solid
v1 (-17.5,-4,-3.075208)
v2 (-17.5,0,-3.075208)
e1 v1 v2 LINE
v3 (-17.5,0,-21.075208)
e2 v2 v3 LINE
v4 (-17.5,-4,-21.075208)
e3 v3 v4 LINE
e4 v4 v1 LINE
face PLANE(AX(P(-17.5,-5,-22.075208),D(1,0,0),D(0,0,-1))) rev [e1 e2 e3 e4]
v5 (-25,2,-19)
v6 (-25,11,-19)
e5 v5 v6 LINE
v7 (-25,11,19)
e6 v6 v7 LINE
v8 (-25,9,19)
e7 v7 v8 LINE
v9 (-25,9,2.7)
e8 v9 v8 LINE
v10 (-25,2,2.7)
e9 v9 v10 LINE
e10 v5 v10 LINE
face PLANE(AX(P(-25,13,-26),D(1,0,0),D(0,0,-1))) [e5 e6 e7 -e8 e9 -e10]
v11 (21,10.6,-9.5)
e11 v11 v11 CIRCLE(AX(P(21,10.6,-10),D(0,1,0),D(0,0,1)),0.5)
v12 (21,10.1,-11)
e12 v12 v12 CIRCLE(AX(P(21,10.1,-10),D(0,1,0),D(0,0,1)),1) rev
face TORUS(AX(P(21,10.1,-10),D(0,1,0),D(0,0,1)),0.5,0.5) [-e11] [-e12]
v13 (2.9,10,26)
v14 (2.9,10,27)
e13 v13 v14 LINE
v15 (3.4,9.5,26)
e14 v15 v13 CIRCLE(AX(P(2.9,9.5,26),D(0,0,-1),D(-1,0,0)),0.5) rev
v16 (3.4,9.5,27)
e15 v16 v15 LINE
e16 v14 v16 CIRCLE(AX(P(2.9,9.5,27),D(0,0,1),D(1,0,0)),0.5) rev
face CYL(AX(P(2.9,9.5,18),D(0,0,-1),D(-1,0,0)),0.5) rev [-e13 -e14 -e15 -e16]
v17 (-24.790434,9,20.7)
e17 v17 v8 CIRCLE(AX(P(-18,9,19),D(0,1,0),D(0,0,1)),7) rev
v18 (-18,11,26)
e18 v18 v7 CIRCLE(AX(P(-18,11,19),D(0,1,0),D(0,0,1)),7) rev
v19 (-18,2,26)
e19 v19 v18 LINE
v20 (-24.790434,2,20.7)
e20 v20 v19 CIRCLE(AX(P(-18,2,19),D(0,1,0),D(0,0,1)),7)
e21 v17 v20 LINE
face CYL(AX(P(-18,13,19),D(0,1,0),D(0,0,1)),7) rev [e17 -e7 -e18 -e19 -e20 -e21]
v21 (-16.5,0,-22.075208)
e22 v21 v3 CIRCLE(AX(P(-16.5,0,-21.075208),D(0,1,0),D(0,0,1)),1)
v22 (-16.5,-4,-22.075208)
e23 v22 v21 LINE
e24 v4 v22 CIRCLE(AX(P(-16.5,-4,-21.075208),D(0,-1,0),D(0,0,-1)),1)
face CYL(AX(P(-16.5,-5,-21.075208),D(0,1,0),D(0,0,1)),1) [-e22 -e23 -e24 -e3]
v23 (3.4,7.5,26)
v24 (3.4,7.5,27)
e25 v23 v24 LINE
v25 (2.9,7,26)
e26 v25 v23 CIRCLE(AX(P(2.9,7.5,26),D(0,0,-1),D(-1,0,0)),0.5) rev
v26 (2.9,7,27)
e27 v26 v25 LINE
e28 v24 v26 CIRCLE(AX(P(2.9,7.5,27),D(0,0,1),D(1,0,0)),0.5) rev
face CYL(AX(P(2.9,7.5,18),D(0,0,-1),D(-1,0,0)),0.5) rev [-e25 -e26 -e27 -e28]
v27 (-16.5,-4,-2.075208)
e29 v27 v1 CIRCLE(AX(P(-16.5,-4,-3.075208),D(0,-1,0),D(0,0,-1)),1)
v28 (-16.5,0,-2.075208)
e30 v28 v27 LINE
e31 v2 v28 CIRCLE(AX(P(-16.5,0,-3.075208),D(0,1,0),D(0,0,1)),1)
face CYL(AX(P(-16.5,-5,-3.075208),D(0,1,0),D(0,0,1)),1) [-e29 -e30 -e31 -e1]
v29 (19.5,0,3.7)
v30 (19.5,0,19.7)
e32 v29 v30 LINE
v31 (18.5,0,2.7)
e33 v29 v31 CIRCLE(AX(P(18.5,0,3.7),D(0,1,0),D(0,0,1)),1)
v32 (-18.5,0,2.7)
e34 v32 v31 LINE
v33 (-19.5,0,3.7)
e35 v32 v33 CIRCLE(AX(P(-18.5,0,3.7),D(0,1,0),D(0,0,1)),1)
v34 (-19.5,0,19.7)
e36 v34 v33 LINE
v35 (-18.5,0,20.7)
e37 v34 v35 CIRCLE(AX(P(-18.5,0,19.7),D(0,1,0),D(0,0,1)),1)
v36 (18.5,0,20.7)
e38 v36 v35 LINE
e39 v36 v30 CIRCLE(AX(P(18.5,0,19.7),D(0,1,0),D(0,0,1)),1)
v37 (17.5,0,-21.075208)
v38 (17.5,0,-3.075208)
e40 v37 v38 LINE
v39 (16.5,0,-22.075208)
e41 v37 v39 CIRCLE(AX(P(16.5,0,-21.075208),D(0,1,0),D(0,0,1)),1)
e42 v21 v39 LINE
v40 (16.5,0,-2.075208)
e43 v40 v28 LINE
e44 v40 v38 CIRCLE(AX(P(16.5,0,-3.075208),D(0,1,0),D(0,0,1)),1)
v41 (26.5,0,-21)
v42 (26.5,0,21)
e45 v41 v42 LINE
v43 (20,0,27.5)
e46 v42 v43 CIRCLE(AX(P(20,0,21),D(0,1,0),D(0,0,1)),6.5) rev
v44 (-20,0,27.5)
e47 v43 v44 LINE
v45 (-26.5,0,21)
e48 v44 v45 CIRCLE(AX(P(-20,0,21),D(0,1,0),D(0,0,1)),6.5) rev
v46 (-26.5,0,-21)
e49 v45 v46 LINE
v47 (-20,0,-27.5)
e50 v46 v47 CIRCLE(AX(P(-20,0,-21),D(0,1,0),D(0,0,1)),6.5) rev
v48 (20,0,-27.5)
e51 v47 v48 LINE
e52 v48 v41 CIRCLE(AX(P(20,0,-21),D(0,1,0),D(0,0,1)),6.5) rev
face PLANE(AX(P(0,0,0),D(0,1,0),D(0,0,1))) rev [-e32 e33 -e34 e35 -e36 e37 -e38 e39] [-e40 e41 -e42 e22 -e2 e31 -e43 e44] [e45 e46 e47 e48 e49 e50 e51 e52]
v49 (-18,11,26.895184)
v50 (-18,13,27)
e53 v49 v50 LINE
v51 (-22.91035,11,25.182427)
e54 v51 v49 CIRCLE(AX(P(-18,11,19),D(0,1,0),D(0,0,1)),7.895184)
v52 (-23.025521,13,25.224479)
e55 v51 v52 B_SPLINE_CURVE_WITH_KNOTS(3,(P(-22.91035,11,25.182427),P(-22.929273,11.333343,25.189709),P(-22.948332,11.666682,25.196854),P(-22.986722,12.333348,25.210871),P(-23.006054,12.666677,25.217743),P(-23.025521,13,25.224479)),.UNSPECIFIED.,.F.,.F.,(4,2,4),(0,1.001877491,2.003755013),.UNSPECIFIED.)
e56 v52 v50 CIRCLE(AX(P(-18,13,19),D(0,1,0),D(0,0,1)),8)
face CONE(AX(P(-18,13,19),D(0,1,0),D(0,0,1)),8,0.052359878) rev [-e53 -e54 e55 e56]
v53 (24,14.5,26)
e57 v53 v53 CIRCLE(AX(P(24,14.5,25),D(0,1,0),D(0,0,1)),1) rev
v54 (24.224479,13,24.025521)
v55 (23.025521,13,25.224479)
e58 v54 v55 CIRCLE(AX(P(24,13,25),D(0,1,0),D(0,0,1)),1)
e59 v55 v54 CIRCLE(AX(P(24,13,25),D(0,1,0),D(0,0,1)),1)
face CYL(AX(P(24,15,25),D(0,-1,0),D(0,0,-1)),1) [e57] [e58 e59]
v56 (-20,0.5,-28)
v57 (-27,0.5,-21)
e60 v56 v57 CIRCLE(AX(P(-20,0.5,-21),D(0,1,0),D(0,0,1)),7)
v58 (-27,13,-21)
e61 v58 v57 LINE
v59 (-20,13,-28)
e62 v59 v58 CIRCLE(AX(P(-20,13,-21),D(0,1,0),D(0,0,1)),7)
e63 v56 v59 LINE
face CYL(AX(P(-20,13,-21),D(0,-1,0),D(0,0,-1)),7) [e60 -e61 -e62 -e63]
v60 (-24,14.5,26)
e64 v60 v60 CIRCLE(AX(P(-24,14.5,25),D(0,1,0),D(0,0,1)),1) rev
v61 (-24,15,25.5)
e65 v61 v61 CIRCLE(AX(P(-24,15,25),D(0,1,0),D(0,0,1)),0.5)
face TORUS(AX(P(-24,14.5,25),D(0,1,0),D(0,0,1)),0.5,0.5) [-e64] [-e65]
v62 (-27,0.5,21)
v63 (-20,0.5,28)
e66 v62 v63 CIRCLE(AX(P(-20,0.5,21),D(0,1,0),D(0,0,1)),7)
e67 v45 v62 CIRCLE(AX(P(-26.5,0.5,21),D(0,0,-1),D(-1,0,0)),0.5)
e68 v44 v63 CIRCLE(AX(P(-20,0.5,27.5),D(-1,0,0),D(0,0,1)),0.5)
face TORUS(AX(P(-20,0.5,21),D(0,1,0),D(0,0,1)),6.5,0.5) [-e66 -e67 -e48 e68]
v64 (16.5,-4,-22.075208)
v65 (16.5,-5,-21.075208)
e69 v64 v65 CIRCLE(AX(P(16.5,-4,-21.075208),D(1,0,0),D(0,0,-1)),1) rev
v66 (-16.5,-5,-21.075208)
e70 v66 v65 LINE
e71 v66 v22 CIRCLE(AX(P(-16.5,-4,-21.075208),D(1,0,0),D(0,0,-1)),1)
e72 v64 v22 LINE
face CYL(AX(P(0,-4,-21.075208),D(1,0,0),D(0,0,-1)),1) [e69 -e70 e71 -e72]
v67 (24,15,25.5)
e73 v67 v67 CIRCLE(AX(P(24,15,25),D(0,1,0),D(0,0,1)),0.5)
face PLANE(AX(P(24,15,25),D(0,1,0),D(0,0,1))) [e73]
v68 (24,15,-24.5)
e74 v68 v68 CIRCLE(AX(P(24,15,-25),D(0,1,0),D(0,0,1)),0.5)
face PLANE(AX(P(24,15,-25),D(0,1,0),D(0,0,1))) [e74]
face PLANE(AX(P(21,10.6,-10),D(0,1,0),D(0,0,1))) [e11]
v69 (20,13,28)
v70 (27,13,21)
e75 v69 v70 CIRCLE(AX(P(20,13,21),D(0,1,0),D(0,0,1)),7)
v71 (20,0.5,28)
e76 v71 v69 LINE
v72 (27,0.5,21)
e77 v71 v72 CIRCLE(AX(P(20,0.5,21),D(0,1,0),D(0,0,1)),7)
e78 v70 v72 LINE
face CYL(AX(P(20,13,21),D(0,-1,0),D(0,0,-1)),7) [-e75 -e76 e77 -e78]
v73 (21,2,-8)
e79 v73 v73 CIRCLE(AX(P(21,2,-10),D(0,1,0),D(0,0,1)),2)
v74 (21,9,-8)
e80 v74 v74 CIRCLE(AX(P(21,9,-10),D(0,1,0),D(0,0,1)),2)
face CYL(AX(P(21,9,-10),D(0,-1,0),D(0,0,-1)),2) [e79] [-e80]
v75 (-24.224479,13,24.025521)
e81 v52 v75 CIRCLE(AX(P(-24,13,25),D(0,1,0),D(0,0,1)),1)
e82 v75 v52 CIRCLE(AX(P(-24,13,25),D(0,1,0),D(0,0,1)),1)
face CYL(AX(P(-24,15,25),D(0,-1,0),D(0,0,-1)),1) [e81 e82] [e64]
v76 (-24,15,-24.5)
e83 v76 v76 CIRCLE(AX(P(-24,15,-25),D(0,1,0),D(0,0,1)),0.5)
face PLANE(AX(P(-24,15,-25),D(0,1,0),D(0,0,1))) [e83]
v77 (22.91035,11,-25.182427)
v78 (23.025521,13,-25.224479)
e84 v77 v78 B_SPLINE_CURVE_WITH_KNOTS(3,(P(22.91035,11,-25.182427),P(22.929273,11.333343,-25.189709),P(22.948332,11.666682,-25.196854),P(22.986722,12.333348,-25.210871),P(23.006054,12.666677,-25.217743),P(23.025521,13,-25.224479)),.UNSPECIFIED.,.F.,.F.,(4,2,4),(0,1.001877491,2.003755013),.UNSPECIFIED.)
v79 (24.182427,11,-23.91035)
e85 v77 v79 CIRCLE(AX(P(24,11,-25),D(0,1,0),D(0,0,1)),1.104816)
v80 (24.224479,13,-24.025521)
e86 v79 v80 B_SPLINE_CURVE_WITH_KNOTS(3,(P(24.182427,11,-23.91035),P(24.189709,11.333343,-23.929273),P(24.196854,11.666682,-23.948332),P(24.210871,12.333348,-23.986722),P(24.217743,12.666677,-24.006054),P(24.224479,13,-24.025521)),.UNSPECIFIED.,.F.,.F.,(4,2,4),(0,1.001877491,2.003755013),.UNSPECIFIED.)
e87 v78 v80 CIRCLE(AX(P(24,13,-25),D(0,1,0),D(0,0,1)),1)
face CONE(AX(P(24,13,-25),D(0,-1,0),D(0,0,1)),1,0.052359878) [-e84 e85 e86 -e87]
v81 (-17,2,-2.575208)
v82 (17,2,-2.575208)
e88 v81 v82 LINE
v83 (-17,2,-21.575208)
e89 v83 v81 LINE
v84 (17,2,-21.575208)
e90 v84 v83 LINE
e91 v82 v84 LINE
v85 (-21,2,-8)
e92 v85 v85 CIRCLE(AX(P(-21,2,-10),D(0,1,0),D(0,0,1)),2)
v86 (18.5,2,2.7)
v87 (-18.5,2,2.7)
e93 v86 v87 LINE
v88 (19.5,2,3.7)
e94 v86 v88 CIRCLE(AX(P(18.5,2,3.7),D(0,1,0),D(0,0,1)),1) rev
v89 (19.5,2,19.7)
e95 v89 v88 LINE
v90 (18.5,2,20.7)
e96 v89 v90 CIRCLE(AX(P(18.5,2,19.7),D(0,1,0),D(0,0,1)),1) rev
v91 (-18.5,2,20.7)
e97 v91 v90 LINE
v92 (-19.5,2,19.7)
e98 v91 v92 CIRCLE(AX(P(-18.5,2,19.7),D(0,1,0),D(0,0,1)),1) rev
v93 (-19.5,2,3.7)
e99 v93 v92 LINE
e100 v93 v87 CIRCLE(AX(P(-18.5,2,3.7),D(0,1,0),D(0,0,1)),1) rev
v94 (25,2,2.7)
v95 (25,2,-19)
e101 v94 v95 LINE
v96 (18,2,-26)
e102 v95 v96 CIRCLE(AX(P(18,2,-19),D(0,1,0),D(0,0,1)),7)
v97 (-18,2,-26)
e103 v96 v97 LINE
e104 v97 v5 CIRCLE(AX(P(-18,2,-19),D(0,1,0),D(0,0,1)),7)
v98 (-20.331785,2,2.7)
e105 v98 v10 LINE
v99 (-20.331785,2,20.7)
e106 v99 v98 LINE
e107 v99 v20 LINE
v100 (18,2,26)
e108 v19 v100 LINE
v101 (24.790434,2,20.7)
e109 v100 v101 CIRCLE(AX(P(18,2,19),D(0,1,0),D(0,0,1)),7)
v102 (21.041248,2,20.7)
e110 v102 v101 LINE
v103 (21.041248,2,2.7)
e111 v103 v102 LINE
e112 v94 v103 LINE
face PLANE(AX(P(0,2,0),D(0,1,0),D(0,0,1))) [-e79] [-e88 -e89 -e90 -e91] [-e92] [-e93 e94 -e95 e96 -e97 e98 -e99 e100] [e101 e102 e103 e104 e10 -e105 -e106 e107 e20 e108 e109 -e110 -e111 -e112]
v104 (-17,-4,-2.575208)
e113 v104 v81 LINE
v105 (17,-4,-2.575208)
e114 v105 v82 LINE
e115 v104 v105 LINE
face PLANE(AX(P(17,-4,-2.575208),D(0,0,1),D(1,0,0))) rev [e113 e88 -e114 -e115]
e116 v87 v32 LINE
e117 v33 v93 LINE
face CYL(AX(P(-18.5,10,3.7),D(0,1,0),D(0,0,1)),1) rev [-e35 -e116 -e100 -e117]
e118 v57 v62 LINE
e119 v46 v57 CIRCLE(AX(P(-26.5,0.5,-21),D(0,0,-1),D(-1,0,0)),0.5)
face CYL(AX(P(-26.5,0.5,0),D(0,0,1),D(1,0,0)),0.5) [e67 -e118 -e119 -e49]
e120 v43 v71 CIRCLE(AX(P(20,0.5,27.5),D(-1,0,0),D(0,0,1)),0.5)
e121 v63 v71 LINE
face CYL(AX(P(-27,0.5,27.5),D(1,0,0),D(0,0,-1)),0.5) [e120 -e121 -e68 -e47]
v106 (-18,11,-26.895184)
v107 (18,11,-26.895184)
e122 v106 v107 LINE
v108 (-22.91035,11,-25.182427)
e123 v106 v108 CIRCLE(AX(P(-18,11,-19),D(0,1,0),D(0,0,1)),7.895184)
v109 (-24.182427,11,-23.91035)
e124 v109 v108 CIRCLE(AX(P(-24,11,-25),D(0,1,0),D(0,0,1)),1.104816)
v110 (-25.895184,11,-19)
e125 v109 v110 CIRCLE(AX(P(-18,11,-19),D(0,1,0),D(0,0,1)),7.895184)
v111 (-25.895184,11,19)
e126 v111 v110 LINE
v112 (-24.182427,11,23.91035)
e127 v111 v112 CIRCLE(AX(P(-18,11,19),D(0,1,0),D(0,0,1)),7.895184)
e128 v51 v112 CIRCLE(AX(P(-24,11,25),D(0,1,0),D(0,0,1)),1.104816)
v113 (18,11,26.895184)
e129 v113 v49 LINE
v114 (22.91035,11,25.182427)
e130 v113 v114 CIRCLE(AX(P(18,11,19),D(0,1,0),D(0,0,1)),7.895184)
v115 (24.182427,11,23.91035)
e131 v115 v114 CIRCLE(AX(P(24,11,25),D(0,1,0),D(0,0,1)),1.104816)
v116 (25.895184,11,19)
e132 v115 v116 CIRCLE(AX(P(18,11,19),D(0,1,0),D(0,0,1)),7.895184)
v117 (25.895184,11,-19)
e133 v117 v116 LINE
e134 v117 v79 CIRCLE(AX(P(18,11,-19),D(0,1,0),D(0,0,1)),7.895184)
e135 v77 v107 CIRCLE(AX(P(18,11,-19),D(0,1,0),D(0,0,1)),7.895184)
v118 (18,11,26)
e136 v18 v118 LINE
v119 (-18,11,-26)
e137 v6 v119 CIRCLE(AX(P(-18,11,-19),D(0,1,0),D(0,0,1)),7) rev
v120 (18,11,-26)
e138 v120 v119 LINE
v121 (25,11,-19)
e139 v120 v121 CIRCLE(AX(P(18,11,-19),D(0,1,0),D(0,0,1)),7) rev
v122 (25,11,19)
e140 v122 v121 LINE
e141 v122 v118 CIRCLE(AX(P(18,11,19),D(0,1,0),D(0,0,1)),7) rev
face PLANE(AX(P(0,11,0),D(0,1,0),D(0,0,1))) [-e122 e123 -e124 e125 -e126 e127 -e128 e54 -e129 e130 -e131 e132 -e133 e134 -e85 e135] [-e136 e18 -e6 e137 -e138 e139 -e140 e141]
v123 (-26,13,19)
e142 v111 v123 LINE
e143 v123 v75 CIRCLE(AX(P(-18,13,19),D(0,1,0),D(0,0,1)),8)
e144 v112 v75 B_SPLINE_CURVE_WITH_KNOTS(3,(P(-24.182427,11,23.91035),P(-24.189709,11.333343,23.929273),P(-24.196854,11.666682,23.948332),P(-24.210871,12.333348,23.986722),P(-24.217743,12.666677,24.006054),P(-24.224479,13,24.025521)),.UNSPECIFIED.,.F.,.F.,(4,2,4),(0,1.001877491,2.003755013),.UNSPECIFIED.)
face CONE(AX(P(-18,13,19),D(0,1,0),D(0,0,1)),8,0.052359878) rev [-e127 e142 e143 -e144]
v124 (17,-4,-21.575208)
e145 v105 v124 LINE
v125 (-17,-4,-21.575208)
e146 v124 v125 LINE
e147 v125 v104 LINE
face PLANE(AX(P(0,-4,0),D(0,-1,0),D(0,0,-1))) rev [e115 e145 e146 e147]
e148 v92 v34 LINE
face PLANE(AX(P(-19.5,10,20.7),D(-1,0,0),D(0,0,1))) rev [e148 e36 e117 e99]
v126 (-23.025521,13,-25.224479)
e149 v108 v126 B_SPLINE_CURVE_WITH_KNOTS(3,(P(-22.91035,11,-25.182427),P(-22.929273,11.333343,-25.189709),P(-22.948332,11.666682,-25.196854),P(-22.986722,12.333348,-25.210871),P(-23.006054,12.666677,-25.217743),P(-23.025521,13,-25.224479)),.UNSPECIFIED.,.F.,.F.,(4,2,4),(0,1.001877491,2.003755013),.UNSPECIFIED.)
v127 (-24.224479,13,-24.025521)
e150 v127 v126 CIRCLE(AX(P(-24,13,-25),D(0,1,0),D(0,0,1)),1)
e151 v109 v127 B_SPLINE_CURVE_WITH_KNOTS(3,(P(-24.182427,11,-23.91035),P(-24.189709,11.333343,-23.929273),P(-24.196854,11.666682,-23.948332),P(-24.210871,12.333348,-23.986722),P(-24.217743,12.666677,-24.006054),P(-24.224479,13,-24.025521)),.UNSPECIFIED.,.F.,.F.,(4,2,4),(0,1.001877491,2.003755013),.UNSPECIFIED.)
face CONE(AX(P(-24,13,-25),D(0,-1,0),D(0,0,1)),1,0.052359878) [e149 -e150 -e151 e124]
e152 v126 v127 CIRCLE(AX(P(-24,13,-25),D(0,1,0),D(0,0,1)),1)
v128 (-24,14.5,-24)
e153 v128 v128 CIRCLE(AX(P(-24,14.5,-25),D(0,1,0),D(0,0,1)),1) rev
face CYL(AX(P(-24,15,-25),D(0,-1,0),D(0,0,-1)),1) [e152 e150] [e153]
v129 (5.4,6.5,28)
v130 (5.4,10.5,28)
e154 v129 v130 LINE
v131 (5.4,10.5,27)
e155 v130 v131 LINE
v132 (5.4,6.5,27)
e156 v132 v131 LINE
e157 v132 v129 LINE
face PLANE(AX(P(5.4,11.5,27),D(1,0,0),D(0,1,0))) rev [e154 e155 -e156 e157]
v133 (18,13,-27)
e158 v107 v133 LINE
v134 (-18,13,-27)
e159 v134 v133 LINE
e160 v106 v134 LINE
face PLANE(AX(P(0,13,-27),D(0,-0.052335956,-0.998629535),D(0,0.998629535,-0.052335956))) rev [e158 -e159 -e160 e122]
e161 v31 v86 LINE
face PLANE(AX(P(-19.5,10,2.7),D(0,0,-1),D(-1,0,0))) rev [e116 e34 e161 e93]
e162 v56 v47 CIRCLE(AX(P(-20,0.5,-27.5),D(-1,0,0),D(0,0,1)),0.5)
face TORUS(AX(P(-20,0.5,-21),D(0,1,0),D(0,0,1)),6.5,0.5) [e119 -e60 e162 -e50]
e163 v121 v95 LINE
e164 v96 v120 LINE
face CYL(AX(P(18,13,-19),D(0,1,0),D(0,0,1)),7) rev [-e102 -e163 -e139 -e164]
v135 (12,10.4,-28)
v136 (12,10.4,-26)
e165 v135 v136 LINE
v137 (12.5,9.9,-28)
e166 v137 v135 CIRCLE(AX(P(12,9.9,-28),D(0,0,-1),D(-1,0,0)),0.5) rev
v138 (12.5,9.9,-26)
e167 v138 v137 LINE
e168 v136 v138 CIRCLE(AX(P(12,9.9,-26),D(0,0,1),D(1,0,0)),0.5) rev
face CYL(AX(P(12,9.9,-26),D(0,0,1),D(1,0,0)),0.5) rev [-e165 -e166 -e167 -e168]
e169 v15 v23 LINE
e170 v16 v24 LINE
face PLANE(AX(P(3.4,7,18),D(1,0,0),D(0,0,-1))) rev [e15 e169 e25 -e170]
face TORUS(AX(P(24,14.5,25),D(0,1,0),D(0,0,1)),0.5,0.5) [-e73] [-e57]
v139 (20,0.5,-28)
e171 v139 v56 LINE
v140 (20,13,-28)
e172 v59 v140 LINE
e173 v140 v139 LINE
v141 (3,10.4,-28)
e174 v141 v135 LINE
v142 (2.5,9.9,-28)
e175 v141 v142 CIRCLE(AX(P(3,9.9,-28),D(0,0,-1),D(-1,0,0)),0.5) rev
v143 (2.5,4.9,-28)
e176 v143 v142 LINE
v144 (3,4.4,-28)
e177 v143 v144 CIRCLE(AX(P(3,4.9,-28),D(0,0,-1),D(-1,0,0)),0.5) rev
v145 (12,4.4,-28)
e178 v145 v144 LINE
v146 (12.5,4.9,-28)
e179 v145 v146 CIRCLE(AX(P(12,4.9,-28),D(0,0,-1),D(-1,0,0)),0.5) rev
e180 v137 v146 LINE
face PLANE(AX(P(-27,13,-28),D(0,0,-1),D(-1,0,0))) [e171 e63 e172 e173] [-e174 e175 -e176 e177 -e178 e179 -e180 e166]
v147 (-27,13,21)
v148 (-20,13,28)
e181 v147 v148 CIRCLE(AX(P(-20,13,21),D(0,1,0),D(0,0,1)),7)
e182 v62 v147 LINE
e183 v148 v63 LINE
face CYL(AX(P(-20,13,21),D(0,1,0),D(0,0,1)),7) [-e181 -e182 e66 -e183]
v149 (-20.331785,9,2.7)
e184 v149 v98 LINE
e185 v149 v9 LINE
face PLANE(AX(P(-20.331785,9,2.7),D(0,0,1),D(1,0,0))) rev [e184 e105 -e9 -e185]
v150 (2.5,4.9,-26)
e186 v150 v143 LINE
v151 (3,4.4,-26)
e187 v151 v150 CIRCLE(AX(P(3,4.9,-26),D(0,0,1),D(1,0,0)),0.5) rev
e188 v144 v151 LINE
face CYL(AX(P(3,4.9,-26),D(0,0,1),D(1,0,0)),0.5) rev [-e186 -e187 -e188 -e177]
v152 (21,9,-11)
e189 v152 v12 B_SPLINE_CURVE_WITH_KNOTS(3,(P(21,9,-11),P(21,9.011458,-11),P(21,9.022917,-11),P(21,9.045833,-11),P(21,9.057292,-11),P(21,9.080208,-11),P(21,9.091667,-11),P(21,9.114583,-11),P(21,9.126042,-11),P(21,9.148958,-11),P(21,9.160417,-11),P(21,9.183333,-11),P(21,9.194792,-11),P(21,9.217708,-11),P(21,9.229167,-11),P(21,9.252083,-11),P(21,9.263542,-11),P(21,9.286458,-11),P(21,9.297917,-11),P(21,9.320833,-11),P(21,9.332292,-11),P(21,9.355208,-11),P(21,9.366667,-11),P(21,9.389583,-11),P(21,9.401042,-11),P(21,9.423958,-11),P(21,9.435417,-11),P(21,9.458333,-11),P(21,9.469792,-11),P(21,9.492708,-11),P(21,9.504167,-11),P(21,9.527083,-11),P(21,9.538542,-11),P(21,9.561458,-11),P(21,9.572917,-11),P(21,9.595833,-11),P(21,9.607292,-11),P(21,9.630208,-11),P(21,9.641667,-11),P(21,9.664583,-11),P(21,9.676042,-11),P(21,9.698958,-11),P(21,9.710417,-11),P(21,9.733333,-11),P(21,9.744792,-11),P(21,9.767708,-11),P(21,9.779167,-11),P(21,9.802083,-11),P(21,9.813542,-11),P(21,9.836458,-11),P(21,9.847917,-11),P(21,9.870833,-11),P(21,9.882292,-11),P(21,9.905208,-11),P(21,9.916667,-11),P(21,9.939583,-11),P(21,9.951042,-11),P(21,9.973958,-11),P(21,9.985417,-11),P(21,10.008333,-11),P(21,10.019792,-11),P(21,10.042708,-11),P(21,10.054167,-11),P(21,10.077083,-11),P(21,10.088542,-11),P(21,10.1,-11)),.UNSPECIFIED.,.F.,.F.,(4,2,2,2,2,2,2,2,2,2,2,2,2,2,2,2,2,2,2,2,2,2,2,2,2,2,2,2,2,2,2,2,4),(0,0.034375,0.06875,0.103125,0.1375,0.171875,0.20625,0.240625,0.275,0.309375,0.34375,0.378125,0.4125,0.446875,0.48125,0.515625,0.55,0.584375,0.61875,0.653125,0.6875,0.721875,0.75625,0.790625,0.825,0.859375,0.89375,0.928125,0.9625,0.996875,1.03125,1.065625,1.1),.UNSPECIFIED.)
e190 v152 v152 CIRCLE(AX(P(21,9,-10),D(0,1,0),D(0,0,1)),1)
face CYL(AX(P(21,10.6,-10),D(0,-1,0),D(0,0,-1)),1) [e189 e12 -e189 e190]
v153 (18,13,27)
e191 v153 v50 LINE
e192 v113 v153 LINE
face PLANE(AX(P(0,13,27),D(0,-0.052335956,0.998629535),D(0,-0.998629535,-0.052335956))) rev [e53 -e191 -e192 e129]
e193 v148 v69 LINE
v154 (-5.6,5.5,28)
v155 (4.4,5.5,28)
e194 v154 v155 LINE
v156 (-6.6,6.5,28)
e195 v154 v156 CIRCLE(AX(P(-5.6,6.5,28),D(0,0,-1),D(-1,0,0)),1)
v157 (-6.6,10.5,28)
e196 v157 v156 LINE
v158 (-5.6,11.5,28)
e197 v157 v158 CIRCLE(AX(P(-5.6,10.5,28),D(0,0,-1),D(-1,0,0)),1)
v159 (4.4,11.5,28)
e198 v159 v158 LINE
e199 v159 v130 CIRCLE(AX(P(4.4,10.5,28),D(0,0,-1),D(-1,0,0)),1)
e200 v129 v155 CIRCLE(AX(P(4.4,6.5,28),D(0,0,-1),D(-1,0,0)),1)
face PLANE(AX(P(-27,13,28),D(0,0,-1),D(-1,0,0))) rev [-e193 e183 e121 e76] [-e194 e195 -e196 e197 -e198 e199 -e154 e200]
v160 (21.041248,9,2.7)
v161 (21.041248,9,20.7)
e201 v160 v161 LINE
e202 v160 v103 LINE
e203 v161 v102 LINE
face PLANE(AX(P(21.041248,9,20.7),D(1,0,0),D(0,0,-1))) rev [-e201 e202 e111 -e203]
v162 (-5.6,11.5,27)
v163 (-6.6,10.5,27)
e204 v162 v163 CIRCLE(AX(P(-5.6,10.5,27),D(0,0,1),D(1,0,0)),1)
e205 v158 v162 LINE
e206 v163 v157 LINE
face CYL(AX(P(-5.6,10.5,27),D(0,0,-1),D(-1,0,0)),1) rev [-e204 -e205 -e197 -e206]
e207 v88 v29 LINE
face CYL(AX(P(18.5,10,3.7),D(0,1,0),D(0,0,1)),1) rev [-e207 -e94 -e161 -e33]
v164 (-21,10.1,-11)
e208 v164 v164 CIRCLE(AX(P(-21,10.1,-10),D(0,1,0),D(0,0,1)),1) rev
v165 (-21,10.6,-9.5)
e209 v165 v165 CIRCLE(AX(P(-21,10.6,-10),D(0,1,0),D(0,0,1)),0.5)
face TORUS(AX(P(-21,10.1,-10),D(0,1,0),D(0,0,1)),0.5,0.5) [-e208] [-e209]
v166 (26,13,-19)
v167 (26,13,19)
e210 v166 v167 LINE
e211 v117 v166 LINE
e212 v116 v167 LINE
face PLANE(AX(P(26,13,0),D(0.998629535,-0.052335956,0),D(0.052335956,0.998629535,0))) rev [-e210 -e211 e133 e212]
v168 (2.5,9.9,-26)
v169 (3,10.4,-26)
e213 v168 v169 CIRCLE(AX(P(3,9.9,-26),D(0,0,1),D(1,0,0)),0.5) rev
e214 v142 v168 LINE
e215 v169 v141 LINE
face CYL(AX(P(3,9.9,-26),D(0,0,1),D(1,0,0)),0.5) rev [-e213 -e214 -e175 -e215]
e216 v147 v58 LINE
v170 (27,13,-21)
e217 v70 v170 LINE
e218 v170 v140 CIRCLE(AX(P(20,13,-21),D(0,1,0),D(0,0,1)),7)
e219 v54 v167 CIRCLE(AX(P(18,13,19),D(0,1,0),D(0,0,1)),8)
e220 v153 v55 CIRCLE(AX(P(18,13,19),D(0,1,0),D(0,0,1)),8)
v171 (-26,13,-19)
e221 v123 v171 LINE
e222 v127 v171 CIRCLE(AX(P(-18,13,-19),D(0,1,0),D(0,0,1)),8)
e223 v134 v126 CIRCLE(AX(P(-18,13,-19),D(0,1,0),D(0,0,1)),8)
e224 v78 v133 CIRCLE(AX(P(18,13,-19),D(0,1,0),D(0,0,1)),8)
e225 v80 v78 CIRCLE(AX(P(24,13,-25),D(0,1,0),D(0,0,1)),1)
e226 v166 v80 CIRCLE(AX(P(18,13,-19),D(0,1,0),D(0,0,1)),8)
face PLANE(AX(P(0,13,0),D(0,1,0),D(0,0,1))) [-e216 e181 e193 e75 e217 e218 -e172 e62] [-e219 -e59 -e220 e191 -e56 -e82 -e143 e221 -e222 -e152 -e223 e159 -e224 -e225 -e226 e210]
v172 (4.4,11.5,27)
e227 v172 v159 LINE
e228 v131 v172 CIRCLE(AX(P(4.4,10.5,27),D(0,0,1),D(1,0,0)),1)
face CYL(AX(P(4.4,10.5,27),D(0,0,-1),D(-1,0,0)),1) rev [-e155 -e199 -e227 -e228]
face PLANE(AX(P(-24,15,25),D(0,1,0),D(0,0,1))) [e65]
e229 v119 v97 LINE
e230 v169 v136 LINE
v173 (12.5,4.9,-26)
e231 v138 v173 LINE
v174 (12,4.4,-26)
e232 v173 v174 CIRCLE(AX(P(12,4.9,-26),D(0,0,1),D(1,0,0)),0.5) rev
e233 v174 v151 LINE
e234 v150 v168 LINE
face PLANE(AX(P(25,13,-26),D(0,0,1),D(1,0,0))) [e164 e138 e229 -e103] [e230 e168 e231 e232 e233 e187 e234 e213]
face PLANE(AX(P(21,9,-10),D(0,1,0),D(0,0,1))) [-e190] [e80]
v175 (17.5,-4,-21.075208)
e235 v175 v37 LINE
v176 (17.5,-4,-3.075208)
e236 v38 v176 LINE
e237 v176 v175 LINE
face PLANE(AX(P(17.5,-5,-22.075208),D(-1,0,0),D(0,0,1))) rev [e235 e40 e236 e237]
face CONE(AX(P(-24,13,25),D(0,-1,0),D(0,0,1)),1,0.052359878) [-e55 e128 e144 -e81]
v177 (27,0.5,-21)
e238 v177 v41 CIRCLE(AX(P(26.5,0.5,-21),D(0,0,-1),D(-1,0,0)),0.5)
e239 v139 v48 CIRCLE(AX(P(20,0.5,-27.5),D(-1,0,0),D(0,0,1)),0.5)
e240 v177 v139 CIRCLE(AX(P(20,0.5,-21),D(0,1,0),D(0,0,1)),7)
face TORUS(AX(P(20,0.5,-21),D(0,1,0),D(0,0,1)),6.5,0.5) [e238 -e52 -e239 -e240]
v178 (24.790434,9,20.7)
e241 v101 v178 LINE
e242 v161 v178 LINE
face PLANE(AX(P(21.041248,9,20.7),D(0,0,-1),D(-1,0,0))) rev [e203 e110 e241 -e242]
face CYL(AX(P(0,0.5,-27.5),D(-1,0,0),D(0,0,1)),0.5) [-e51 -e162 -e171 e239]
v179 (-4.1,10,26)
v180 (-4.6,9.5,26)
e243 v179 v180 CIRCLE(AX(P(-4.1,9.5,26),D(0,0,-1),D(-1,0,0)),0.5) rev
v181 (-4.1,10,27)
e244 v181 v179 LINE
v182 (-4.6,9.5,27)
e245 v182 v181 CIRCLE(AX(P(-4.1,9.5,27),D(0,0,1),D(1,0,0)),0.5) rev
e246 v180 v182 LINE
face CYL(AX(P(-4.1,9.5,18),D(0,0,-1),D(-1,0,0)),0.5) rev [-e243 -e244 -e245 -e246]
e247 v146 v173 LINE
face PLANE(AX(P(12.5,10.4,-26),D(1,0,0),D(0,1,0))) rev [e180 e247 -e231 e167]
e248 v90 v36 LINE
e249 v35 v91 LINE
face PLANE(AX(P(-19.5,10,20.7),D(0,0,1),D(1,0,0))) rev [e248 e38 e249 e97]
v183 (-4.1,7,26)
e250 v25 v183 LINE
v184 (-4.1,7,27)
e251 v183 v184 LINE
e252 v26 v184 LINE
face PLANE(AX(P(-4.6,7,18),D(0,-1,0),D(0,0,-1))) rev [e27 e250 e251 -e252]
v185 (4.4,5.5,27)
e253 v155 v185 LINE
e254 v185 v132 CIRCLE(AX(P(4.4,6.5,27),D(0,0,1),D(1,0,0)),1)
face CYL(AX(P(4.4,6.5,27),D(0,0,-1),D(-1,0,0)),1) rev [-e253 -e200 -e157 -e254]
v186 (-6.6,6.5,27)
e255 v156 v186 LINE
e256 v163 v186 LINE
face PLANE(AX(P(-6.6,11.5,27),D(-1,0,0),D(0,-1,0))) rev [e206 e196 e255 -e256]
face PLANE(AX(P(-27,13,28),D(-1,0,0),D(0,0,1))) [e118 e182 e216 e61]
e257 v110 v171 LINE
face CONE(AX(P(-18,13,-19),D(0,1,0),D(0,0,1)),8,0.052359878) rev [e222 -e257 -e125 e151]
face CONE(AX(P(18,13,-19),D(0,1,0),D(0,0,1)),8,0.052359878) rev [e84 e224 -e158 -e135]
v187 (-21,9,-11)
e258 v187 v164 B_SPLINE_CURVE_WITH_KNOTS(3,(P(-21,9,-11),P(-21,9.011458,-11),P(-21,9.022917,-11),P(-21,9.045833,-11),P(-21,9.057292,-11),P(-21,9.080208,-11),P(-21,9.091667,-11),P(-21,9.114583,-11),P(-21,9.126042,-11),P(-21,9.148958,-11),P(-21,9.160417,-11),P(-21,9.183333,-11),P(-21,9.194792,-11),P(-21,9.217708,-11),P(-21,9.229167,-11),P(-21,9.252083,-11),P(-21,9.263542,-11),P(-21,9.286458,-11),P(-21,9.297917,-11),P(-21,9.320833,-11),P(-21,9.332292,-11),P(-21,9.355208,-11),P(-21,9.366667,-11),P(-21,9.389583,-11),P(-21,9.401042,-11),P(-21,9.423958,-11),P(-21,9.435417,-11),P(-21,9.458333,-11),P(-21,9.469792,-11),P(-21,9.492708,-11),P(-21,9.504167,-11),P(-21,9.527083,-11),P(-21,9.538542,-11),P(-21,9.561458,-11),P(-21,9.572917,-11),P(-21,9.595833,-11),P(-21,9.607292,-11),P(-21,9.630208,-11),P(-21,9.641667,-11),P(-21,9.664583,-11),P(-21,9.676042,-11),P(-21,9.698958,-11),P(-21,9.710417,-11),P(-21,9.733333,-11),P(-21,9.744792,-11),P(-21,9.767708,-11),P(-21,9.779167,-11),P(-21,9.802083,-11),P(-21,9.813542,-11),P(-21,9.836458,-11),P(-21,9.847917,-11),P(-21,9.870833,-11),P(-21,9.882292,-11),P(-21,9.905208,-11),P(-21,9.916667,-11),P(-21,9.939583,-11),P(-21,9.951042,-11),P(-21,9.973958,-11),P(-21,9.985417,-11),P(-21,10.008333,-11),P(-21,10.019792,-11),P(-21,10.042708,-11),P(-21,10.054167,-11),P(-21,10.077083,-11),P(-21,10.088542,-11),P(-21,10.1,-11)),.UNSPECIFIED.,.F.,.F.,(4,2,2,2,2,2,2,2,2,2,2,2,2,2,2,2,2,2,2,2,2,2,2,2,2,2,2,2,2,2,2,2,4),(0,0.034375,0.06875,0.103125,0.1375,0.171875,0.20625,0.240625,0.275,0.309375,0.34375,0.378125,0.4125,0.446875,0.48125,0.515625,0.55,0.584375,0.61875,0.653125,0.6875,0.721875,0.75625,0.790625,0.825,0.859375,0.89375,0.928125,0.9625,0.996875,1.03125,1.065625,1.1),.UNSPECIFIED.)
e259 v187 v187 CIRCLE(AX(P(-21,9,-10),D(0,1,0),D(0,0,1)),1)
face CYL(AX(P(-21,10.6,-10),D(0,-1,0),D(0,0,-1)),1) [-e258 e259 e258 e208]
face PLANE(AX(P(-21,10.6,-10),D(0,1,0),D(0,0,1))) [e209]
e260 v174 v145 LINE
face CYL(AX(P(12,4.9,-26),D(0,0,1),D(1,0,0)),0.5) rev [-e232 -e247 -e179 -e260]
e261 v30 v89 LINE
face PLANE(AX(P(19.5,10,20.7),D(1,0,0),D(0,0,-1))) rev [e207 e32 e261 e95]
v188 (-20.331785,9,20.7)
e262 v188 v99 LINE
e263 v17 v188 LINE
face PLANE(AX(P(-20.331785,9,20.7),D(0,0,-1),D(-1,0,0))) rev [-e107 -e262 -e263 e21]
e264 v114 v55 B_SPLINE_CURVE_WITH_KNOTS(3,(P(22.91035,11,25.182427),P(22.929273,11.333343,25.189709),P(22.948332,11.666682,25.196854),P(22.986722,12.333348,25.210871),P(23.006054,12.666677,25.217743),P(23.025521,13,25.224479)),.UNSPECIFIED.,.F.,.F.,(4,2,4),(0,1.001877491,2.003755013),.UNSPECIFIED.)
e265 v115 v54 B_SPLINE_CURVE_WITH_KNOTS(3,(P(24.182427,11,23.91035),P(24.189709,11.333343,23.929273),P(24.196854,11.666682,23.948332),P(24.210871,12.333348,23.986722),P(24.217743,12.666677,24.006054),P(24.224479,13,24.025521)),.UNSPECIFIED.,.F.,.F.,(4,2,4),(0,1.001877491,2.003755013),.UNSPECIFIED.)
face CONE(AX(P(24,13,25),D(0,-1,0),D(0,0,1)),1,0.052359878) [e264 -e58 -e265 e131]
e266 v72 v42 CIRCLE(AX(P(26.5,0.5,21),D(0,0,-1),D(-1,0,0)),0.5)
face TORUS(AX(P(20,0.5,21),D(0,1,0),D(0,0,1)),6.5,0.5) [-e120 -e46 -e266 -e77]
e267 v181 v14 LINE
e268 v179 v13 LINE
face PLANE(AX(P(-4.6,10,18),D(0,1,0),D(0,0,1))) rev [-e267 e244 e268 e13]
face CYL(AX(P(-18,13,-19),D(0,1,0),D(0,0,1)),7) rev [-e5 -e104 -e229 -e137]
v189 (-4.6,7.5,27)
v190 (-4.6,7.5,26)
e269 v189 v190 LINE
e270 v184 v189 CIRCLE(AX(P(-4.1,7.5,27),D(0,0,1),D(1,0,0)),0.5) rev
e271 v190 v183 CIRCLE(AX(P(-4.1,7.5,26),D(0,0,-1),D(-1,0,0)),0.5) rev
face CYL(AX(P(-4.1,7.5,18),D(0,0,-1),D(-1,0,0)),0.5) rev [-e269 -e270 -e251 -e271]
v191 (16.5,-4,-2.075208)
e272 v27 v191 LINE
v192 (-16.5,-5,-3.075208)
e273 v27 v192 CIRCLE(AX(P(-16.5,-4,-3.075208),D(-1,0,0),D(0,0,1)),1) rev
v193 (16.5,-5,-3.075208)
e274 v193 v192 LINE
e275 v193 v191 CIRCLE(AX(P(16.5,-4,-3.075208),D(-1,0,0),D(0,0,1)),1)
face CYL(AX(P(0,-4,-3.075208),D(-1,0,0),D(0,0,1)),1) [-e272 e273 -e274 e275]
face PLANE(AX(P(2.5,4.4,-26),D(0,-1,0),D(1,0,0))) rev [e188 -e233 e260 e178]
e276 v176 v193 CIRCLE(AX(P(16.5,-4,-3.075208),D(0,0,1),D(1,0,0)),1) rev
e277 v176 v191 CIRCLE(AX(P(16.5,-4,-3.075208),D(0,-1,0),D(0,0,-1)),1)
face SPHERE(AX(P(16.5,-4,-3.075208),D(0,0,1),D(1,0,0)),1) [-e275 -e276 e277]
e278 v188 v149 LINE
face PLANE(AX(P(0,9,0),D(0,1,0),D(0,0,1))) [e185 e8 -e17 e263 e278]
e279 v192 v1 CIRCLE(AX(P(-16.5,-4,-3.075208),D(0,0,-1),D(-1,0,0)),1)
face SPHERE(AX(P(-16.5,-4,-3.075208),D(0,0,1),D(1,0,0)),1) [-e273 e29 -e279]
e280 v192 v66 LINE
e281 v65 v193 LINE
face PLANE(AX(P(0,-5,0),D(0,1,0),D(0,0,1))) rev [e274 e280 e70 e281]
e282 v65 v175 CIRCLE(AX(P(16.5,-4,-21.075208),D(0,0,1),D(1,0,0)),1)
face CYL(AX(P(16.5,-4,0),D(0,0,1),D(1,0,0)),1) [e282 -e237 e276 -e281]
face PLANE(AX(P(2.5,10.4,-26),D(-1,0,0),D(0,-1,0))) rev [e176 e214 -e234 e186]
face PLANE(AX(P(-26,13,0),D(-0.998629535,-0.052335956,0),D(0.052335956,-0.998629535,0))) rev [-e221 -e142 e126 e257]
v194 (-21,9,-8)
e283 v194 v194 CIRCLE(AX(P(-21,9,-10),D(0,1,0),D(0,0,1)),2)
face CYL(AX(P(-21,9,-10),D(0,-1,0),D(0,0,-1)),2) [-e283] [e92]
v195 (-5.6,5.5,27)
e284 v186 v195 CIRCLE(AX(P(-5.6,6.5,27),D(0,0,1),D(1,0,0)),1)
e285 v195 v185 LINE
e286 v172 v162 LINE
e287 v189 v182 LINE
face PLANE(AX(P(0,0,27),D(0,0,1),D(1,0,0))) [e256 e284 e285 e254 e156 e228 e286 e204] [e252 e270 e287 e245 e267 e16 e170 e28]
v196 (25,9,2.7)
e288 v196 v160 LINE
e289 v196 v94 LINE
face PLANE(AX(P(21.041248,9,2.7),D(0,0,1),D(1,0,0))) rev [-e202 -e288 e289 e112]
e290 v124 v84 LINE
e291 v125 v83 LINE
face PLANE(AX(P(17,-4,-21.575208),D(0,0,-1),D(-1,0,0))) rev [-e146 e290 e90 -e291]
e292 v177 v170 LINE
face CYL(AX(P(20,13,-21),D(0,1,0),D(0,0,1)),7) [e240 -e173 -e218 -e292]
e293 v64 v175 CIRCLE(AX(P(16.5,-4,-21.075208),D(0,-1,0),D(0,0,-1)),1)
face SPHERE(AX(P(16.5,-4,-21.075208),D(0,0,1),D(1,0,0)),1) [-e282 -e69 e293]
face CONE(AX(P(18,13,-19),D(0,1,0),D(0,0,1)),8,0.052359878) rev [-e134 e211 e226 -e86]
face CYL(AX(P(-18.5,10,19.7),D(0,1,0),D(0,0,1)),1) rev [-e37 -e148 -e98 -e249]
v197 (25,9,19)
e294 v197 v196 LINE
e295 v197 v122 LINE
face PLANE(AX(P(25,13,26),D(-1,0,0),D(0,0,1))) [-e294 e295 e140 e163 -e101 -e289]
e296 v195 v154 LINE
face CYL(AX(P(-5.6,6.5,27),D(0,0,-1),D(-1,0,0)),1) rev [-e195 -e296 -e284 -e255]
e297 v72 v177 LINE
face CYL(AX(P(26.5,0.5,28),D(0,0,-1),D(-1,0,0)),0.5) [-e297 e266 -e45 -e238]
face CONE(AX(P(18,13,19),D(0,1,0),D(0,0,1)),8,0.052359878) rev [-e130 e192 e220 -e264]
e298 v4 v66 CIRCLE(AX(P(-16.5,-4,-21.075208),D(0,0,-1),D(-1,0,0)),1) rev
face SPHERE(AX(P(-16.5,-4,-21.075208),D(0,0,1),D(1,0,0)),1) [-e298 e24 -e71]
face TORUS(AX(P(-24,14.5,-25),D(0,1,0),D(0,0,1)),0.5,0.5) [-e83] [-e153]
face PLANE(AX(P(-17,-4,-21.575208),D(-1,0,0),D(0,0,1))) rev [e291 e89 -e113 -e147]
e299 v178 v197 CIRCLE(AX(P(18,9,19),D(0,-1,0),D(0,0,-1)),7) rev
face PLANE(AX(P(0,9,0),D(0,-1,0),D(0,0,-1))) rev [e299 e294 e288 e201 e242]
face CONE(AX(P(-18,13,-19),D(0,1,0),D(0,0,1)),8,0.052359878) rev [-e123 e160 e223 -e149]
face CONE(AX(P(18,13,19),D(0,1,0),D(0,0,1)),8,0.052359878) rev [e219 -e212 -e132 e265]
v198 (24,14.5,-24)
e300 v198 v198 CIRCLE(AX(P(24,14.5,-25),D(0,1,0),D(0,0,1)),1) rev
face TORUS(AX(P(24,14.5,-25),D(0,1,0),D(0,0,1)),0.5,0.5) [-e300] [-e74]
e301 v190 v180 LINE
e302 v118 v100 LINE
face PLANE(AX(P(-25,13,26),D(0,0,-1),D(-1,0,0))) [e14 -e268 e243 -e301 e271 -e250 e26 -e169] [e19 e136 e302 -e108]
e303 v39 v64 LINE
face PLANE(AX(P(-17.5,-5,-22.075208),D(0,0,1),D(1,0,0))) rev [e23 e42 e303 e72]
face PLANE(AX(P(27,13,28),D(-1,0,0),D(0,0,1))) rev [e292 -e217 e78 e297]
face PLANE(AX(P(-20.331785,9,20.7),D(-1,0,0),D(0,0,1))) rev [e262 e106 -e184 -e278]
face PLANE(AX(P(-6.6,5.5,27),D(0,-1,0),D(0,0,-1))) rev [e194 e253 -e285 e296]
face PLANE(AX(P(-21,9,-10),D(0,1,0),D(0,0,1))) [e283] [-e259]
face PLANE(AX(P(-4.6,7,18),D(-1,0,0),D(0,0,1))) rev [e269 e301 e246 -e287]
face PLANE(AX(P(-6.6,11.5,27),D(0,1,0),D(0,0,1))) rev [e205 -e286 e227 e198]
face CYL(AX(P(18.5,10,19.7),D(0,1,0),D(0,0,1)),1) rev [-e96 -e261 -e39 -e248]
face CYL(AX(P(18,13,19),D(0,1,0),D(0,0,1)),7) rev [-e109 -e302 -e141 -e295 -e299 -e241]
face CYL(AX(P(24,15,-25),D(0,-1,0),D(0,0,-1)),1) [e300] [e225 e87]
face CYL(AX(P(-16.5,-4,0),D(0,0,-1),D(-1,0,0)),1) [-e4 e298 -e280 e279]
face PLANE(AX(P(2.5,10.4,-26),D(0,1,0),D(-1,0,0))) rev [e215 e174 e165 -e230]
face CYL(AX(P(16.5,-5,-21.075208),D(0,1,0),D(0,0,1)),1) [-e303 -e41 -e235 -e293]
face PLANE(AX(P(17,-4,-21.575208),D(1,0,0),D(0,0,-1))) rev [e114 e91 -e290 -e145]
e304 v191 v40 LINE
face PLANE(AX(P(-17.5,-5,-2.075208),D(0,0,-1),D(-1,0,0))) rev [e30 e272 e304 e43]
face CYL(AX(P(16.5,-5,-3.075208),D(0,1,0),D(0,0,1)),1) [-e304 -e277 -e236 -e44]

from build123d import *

# Parameters (mm, degrees)
SKETCH1_W                = 54
SKETCH1_H                = 56.00000000000001
BOSS_EXTRUDE1_DEPTH      = 13
CUT_EXTRUDE1_DEPTH       = 11
SKETCH30_R               = 1.0000000000000018
BOSS_EXTRUDE2_DEPTH      = 8.6
CUT_EXTRUDE2_DEPTH       = 10
FILLET2_R                = 7
FILLET3_R                = 7
FILLET4_R                = 7
SKETCH33_W               = 7.999999999999999
SKETCH33_H               = 2.9999999999999973
CUT_EXTRUDE3_DEPTH       = 10
CUT_EXTRUDE9_DEPTH       = 2
FILLET6_R                = 0.5
SKETCH45_R               = 1.0000000000000018
BOSS_EXTRUDE4_DEPTH      = 2
FILLET8_R                = 0.5
FILLET9_R                = 1
FILLET10_R               = 0.5
FILLET11_R               = 0.5
LIP_GROOVE1_GROOVE_DEPTH = 2
LIP_GROOVE1_GROOVE_DRAFT = -3
FILLET12_R               = 0.5
SKETCH47_R               = 1.9999999999999996
BOSS_EXTRUDE5_DEPTH      = 7
BOSS_EXTRUDE7_DEPTH      = 5
CUT_EXTRUDE10_DEPTH      = 6
FILLET14_R               = 1
FILLET15_R               = 1
SKETCH51_W               = 4.668214643890426
SKETCH51_H               = 18
SKETCH51_W_2             = 3.958751602538854
BOSS_EXTRUDE8_DEPTH      = 7
CUT_EXTRUDE11_DEPTH      = 1
FILLET16_R               = 1


# Read off the part's stored shape, not the designer's step: Lip&Groove1-Groove
with BuildPart() as part:
    # Sketch1 → Boss-Extrude1 (new body)
    with BuildSketch(Plane(origin=(0, 0, 0), x_dir=(1, 0, 0), z_dir=(0, 1, 0))):
        Rectangle(SKETCH1_W, SKETCH1_H)
    extrude(amount=BOSS_EXTRUDE1_DEPTH)

    # 3DSketch1 → Cut-Extrude1 (cut)
    with BuildSketch(Plane(origin=(24.999999999999986, 13, -26.000000000000018), x_dir=(-0.6931087162517843, 0, 0.7208330649018562), z_dir=(0, -1, 0))):
        Polygon((0, 0), (34.65543581258921, 36.041653245092796), (72.13875518748574, 0), (37.48331937489653, -36.041653245092796), align=None)
    extrude(amount=CUT_EXTRUDE1_DEPTH, mode=Mode.SUBTRACT)

    # Sketch30 → Boss-Extrude2 (add)
    with BuildSketch(Plane(origin=(0, 2.0000000000000018, 0), x_dir=(1, 0, 0), z_dir=(0, 1, 0))):
        with Locations(Location((21.000000000000007, 10.000000000000002, 0), (0, 0, 90))):
            Circle(SKETCH30_R)
        with Locations(Location((-21.000000000000014, 10.000000000000002, 0), (0, 0, 90))):
            Circle(SKETCH30_R)
    extrude(amount=BOSS_EXTRUDE2_DEPTH)

    # Sketch32 → Cut-Extrude2 (cut)
    with BuildSketch(Plane(origin=(0, 0, 0), x_dir=(-1, 0, 0), z_dir=(0, -1, 0))):
        Polygon((19.500000000000025, -20.700000000000006), (-19.499999999999975, -20.700000000000006), (-19.499999999999975, -2.700000000000008), (19.500000000000025, -2.7000000000000046), align=None)
    extrude(amount=-CUT_EXTRUDE2_DEPTH, mode=Mode.SUBTRACT)

    # Fillet2
    fillet2_edges = [part.edges().sort_by_distance(p)[0] for p in [
        (-25, 7.5, 26.000000000000004),
    ]]
    fillet(fillet2_edges, radius=FILLET2_R)

    # Fillet3
    fillet3_edges = [part.edges().sort_by_distance(p)[0] for p in [
        (24.999999999999986, 7.5, -26.000000000000018),
        (-25, 7.5, -26.00000000000001),
        (24.99999999999999, 7.5, 25.999999999999996),
    ]]
    fillet(fillet3_edges, radius=FILLET3_R)

    # Fillet4
    fillet4_edges = [part.edges().sort_by_distance(p)[0] for p in [
        (-27.000000000000004, 6.5, 28),
        (-27.000000000000004, 6.5, -28),
        (26.999999999999996, 6.5, -28),
        (26.999999999999996, 6.5, 28),
    ]]
    fillet(fillet4_edges, radius=FILLET4_R)

    # Sketch33 → Cut-Extrude3 (cut)
    with BuildSketch(Plane.XY.offset(28)):
        with Locations((-0.6000000000000001, 8.5)):
            Rectangle(SKETCH33_W, SKETCH33_H)
    extrude(amount=-CUT_EXTRUDE3_DEPTH, mode=Mode.SUBTRACT)

    # Sketch42 → Cut-Extrude9 (cut)
    with BuildSketch(Plane(origin=(0, 0, -28), x_dir=(-1, 0, 0), z_dir=(0, 0, -1))):
        Polygon((-2.499999999999998, 10.4), (-12.499999999999998, 10.399999999999999), (-12.499999999999996, 4.399999999999999), (-2.4999999999999973, 4.3999999999999995), align=None)
    extrude(amount=-CUT_EXTRUDE9_DEPTH, mode=Mode.SUBTRACT)

    # Fillet6
    fillet6_edges = [part.edges().sort_by_distance(p)[0] for p in [
        (26.999999999999996, 0, 0),
        (-3.55e-15, 0, 28),
        (-27.000000000000004, 0, 0),
        (-3.55e-15, 0, -28),
        (-24.949747468305837, 0, 25.949747468305834),
        (-24.949747468305837, 0, -25.94974746830583),
        (24.94974746830583, 0, -25.94974746830583),
        (24.94974746830583, 0, 25.949747468305834),
    ]]
    fillet(fillet6_edges, radius=FILLET6_R)

    # Sketch45 → Boss-Extrude4 (add)
    with BuildSketch(Plane(origin=(0, 13, 0), x_dir=(1, 0, 0), z_dir=(0, 1, 0))):
        with Locations(Location((23.999999999999996, -25, 0), (0, 0, 270))):
            Circle(SKETCH45_R)
        with Locations(Location((-24.000000000000004, -25, 0), (0, 0, 270))):
            Circle(SKETCH45_R)
        with Locations(Location((-24.000000000000004, 24.999999999999996, 0), (0, 0, 270))):
            Circle(SKETCH45_R)
        with Locations(Location((23.999999999999993, 25, 0), (0, 0, 270))):
            Circle(SKETCH45_R)
    extrude(amount=BOSS_EXTRUDE4_DEPTH)

    # Fillet8
    fillet8_edges = [part.edges().sort_by_distance(p)[0] for p in [
        (23.999999999999996, 15, 24),
        (-24.000000000000004, 15, 24),
        (-24.000000000000004, 15, -26),
        (23.999999999999993, 15, -26),
    ]]
    fillet(fillet8_edges, radius=FILLET8_R)

    # Fillet9
    fillet9_edges = [part.edges().sort_by_distance(p)[0] for p in [
        (19.499999999999975, 1, 20.700000000000006),
        (19.499999999999975, 1, 2.700000000000008),
        (-19.500000000000025, 1, 2.7000000000000046),
        (-19.500000000000025, 1, 20.700000000000006),
    ]]
    fillet(fillet9_edges, radius=FILLET9_R)

    # Fillet10
    fillet10_edges = [part.edges().sort_by_distance(p)[0] for p in [
        (12.499999999999996, 4.399999999999999, -27),
        (12.499999999999998, 10.399999999999999, -27),
        (2.499999999999998, 10.4, -27),
        (2.4999999999999973, 4.3999999999999995, -27),
    ]]
    fillet(fillet10_edges, radius=FILLET10_R)

    # Fillet11
    fillet11_edges = [part.edges().sort_by_distance(p)[0] for p in [
        (3.4, 9.999999999999998, 27),
        (3.4, 7, 27),
        (-4.6, 7, 27),
        (-4.6, 9.999999999999998, 27),
    ]]
    fillet(fillet11_edges, radius=FILLET11_R)


with BuildPart() as lip_groove1_groove_tool:
    # Lip&Groove1-Groove outline → Lip&Groove1-Groove (with draft: the straight prism first)
    with BuildSketch(Plane(origin=(0, 11, 0), x_dir=(1, 0, 0), z_dir=(0, 1, 0))):
        with BuildLine():
            ThreePointArc((-22.910349682, 25.18242698), (-23.218777427, 24.218777427), (-24.18242698, 23.910349682))
            ThreePointArc((-24.18242698, 23.910349682), (-25.454707864, 21.600243841), (-25.895184441, 19))
            Line((-25.895184441, 19), (-25.895184441, -19))
            ThreePointArc((-25.895184441, -19), (-25.454707864, -21.600243841), (-24.18242698, -23.910349682))
            ThreePointArc((-24.18242698, -23.910349682), (-23.218777427, -24.218777427), (-22.910349682, -25.18242698))
            ThreePointArc((-22.910349682, -25.18242698), (-20.600243841, -26.454707864), (-18, -26.895184441))
            Line((-18, -26.895184441), (18, -26.895184441))
            ThreePointArc((18, -26.895184441), (20.600243841, -26.454707864), (22.910349682, -25.18242698))
            ThreePointArc((22.910349682, -25.18242698), (23.218777427, -24.218777427), (24.18242698, -23.910349682))
            ThreePointArc((24.18242698, -23.910349682), (25.454707864, -21.600243841), (25.895184441, -19))
            Line((25.895184441, -19), (25.895184441, 19))
            ThreePointArc((25.895184441, 19), (25.454707864, 21.600243841), (24.18242698, 23.910349682))
            ThreePointArc((24.18242698, 23.910349682), (23.218777427, 24.218777427), (22.910349682, 25.18242698))
            ThreePointArc((22.910349682, 25.18242698), (20.600243841, 26.454707864), (18, 26.895184441))
            Line((18, 26.895184441), (-18, 26.895184441))
            ThreePointArc((-18, 26.895184441), (-20.600243841, 26.454707864), (-22.910349682, 25.18242698))
        make_face()
        with BuildLine():
            ThreePointArc((-25, 19), (-22.949747468, 23.949747468), (-18, 26))
            Line((-18, 26), (18, 26))
            ThreePointArc((18, 26), (22.949747468, 23.949747468), (25, 19))
            Line((25, 19), (25, -19))
            ThreePointArc((25, -19), (22.949747468, -23.949747468), (18, -26))
            Line((18, -26), (-18, -26))
            ThreePointArc((-18, -26), (-22.949747468, -23.949747468), (-25, -19))
            Line((-25, -19), (-25, 19))
        make_face(mode=Mode.SUBTRACT)
    extrude(amount=LIP_GROOVE1_GROOVE_DEPTH)
    # Lip&Groove1-Groove: the draft: its side faces are tilted about the plane it starts from
    lip_groove1_groove_sides = [lip_groove1_groove_tool.faces().sort_by_distance(p)[0] for p in [
        (-23.218777427, 12, -24.218777427),
        (-25.454707864, 12, -21.600243841),
        (-25.895184441, 12, 0),
        (-25.454707864, 12, 21.600243841),
        (-23.218777427, 12, 24.218777427),
        (-20.600243841, 12, 26.454707864),
        (0, 12, 26.895184441),
        (20.600243841, 12, 26.454707864),
        (23.218777427, 12, 24.218777427),
        (25.454707864, 12, 21.600243841),
        (25.895184441, 12, 0),
        (25.454707864, 12, -21.600243841),
        (23.218777427, 12, -24.218777427),
        (20.600243841, 12, -26.454707864),
        (0, 12, -26.895184441),
        (-20.600243841, 12, -26.454707864),
        (-22.949747468, 12, -23.949747468),
        (0, 12, -26),
        (22.949747468, 12, -23.949747468),
        (25, 12, 0),
        (22.949747468, 12, 23.949747468),
        (0, 12, 26),
        (-22.949747468, 12, 23.949747468),
        (-25, 12, 0),
    ]]
    draft(lip_groove1_groove_sides, Plane(origin=(0, 11, 0), x_dir=(1, 0, 0), z_dir=(0, 1, 0)), LIP_GROOVE1_GROOVE_DRAFT)


with BuildPart() as part_1:
    add(part.part)

    # Lip&Groove1-Groove: cut by lip_groove1_groove_tool
    add(lip_groove1_groove_tool.part, mode=Mode.SUBTRACT)

    # Fillet12
    fillet12_edges = [part_1.edges().sort_by_distance(p)[0] for p in [
        (21.000000000000007, 10.600000000000001, -9),
        (-21.000000000000014, 10.600000000000001, -9),
    ]]
    fillet(fillet12_edges, radius=FILLET12_R)

    # Sketch47 → Boss-Extrude5 (add)
    with BuildSketch(Plane(origin=(0, 2.0000000000000018, 0), x_dir=(1, 0, 0), z_dir=(0, 1, 0))):
        with Locations(Location((21.000000000000007, 10.000000000000002, 0), (0, 0, 270))):
            Circle(SKETCH47_R)
        with Locations(Location((-21.000000000000014, 10.000000000000002, 0), (0, 0, 270))):
            Circle(SKETCH47_R)
    extrude(amount=BOSS_EXTRUDE5_DEPTH)

    # Sketch49 → Boss-Extrude7 (add)
    with BuildSketch(Plane(origin=(0, 0, 0), x_dir=(-1, 0, 0), z_dir=(0, -1, 0))):
        Polygon((17.499999999999996, 22.075207643153902), (-17.500000000000004, 22.075207643153888), (-17.500000000000004, 2.0752076431538886), (17.500000000000004, 2.0752076431538993), align=None)
    extrude(amount=BOSS_EXTRUDE7_DEPTH)

    # Sketch50 → Cut-Extrude10 (cut)
    with BuildSketch(Plane(origin=(0, 2.0000000000000018, 0), x_dir=(1, 0, 0), z_dir=(0, 1, 0))):
        Polygon((16.999999999999996, 21.5752076431539), (-17.000000000000004, 21.575207643153902), (-17.000000000000004, 2.5752076431538975), (16.999999999999996, 2.5752076431539046), align=None)
    extrude(amount=-CUT_EXTRUDE10_DEPTH, mode=Mode.SUBTRACT)

    # Fillet14
    fillet14_edges = [part_1.edges().sort_by_distance(p)[0] for p in [
        (17.500000000000004, -5, -12.075207643153888),
        (0, -5, -2.075207643153894),
        (-17.5, -5, -12.0752076431539),
        (3.55e-15, -5, -22.075207643153895),
    ]]
    fillet(fillet14_edges, radius=FILLET14_R)

    # Fillet15
    # the kernel refuses this fillet: 1 mm, written as the material it takes off along each edge
    with BuildSketch(Plane(origin=(-16.500000000000004, -4, -3.075207643153899), x_dir=(-3e-16, 0, 1), z_dir=(-1, 0, -3.6e-16))) as fillet15_piece_1_section:
        Polygon((0, 0), (FILLET15_R, 0), (FILLET15_R, -FILLET15_R), (0, -FILLET15_R), align=None)
    fillet15_piece_1 = extrude(amount=FILLET15_R, mode=Mode.PRIVATE)
    fillet15_piece_1 = fillet15_piece_1 - Plane(origin=(-16.500000000000004, -4, -3.075207643153899), x_dir=(0, 0.7071067811865475, -0.7071067811865475), z_dir=(-1, 0, -3.6e-16)) * Sphere(FILLET15_R, mode=Mode.PRIVATE)
    add(fillet15_piece_1, mode=Mode.SUBTRACT)
    with BuildSketch(Plane(origin=(16.500000000000004, -4, -3.075207643153889), x_dir=(1, 0, 0), z_dir=(-3e-16, 0, 1))) as fillet15_piece_2_section:
        Polygon((0, 0), (FILLET15_R, 0), (FILLET15_R, -FILLET15_R), (0, -FILLET15_R), align=None)
    fillet15_piece_2 = extrude(amount=FILLET15_R, mode=Mode.PRIVATE)
    fillet15_piece_2 = fillet15_piece_2 - Plane(origin=(16.500000000000004, -4, -3.075207643153889), x_dir=(-0.7071067811865475, 0.7071067811865475, 0), z_dir=(-3e-16, 0, 1)) * Sphere(FILLET15_R, mode=Mode.PRIVATE)
    add(fillet15_piece_2, mode=Mode.SUBTRACT)
    with BuildSketch(Plane(origin=(-16.499999999999996, -4, -21.075207643153902), x_dir=(4.1e-16, 0, -1), z_dir=(-1, 0, -3.6e-16))) as fillet15_piece_3_section:
        Polygon((0, 0), (FILLET15_R, 0), (FILLET15_R, FILLET15_R), (0, FILLET15_R), align=None)
    fillet15_piece_3 = extrude(amount=FILLET15_R, mode=Mode.PRIVATE)
    fillet15_piece_3 = fillet15_piece_3 - Plane(origin=(-16.499999999999996, -4, -21.075207643153902), x_dir=(0, 0.7071067811865475, 0.7071067811865475), z_dir=(-1, 0, -3.6e-16)) * Sphere(FILLET15_R, mode=Mode.PRIVATE)
    add(fillet15_piece_3, mode=Mode.SUBTRACT)
    with BuildSketch(Plane(origin=(16.500000000000004, -4, -21.075207643153888), x_dir=(1, 0, 0), z_dir=(4.1e-16, 0, -1))) as fillet15_piece_4_section:
        Polygon((0, 0), (FILLET15_R, 0), (FILLET15_R, FILLET15_R), (0, FILLET15_R), align=None)
    fillet15_piece_4 = extrude(amount=FILLET15_R, mode=Mode.PRIVATE)
    fillet15_piece_4 = fillet15_piece_4 - Plane(origin=(16.500000000000004, -4, -21.075207643153888), x_dir=(-0.7071067811865475, 0.7071067811865475, 0), z_dir=(4.1e-16, 0, -1)) * Sphere(FILLET15_R, mode=Mode.PRIVATE)
    add(fillet15_piece_4, mode=Mode.SUBTRACT)
    with BuildSketch(Plane(origin=(17.500000000000004, 0, -22.075207643153888), x_dir=(-1, 0, 0), z_dir=(0, -1, 0)), Plane(origin=(-17.499999999999996, 0, -22.075207643153902), x_dir=(0, 0, 1), z_dir=(0, -1, 0))) as fillet15_piece_5:
        with BuildLine():
            CenterArc((FILLET15_R, -FILLET15_R), FILLET15_R, 90, 90)
            Line((0, -FILLET15_R), (0, 0))
            Line((0, 0), (FILLET15_R, 0))
        make_face()
    extrude(amount=4, mode=Mode.SUBTRACT)
    with BuildSketch(Plane(origin=(-17.500000000000004, 0, -2.0752076431538993), x_dir=(0, 0, -1), z_dir=(0, -1, 0))) as fillet15_piece_6:
        with BuildLine():
            CenterArc((FILLET15_R, FILLET15_R), FILLET15_R, 180, 90)
            Line((0, FILLET15_R), (0, 0))
            Line((0, 0), (FILLET15_R, 0))
        make_face()
    extrude(amount=4, mode=Mode.SUBTRACT)
    with BuildSketch(Plane(origin=(17.500000000000004, 0, -2.0752076431538886), x_dir=(-1, 0, -4.4e-16), z_dir=(0, -1, 0))) as fillet15_piece_7:
        with BuildLine():
            CenterArc((FILLET15_R, FILLET15_R), FILLET15_R, 180.00000000000003, 89.99999999999994)
            Line((4.4e-16, FILLET15_R), (0, 0))
            Line((0, 0), (FILLET15_R, 0))
        make_face()
    extrude(amount=4, mode=Mode.SUBTRACT)

    # Sketch51 → Boss-Extrude8 (add)
    with BuildSketch(Plane(origin=(0, 2.0000000000000018, 0), x_dir=(1, 0, 0), z_dir=(0, 1, 0))):
        with Locations((-22.66589267805479, -11.700000000000006)):
            Rectangle(SKETCH51_W, SKETCH51_H)
        with Locations((23.02062419873056, -11.700000000000006)):
            Rectangle(SKETCH51_W_2, SKETCH51_H)
    extrude(amount=BOSS_EXTRUDE8_DEPTH)

    # Sketch52 → Cut-Extrude11 (cut)
    with BuildSketch(Plane.XY.offset(28)):
        Polygon((-6.6, 11.499999999999998), (5.4, 11.499999999999998), (5.400000000000001, 5.5), (-6.599999999999999, 5.5), align=None)
    extrude(amount=-CUT_EXTRUDE11_DEPTH, mode=Mode.SUBTRACT)

    # Fillet16
    fillet16_edges = [part_1.edges().sort_by_distance(p)[0] for p in [
        (-6.599999999999999, 5.5, 27.5),
        (-6.6, 11.499999999999998, 27.5),
        (5.4, 11.499999999999998, 27.5),
        (5.400000000000001, 5.5, 27.5),
    ]]
    fillet(fillet16_edges, radius=FILLET16_R)


solid = part_1.part
